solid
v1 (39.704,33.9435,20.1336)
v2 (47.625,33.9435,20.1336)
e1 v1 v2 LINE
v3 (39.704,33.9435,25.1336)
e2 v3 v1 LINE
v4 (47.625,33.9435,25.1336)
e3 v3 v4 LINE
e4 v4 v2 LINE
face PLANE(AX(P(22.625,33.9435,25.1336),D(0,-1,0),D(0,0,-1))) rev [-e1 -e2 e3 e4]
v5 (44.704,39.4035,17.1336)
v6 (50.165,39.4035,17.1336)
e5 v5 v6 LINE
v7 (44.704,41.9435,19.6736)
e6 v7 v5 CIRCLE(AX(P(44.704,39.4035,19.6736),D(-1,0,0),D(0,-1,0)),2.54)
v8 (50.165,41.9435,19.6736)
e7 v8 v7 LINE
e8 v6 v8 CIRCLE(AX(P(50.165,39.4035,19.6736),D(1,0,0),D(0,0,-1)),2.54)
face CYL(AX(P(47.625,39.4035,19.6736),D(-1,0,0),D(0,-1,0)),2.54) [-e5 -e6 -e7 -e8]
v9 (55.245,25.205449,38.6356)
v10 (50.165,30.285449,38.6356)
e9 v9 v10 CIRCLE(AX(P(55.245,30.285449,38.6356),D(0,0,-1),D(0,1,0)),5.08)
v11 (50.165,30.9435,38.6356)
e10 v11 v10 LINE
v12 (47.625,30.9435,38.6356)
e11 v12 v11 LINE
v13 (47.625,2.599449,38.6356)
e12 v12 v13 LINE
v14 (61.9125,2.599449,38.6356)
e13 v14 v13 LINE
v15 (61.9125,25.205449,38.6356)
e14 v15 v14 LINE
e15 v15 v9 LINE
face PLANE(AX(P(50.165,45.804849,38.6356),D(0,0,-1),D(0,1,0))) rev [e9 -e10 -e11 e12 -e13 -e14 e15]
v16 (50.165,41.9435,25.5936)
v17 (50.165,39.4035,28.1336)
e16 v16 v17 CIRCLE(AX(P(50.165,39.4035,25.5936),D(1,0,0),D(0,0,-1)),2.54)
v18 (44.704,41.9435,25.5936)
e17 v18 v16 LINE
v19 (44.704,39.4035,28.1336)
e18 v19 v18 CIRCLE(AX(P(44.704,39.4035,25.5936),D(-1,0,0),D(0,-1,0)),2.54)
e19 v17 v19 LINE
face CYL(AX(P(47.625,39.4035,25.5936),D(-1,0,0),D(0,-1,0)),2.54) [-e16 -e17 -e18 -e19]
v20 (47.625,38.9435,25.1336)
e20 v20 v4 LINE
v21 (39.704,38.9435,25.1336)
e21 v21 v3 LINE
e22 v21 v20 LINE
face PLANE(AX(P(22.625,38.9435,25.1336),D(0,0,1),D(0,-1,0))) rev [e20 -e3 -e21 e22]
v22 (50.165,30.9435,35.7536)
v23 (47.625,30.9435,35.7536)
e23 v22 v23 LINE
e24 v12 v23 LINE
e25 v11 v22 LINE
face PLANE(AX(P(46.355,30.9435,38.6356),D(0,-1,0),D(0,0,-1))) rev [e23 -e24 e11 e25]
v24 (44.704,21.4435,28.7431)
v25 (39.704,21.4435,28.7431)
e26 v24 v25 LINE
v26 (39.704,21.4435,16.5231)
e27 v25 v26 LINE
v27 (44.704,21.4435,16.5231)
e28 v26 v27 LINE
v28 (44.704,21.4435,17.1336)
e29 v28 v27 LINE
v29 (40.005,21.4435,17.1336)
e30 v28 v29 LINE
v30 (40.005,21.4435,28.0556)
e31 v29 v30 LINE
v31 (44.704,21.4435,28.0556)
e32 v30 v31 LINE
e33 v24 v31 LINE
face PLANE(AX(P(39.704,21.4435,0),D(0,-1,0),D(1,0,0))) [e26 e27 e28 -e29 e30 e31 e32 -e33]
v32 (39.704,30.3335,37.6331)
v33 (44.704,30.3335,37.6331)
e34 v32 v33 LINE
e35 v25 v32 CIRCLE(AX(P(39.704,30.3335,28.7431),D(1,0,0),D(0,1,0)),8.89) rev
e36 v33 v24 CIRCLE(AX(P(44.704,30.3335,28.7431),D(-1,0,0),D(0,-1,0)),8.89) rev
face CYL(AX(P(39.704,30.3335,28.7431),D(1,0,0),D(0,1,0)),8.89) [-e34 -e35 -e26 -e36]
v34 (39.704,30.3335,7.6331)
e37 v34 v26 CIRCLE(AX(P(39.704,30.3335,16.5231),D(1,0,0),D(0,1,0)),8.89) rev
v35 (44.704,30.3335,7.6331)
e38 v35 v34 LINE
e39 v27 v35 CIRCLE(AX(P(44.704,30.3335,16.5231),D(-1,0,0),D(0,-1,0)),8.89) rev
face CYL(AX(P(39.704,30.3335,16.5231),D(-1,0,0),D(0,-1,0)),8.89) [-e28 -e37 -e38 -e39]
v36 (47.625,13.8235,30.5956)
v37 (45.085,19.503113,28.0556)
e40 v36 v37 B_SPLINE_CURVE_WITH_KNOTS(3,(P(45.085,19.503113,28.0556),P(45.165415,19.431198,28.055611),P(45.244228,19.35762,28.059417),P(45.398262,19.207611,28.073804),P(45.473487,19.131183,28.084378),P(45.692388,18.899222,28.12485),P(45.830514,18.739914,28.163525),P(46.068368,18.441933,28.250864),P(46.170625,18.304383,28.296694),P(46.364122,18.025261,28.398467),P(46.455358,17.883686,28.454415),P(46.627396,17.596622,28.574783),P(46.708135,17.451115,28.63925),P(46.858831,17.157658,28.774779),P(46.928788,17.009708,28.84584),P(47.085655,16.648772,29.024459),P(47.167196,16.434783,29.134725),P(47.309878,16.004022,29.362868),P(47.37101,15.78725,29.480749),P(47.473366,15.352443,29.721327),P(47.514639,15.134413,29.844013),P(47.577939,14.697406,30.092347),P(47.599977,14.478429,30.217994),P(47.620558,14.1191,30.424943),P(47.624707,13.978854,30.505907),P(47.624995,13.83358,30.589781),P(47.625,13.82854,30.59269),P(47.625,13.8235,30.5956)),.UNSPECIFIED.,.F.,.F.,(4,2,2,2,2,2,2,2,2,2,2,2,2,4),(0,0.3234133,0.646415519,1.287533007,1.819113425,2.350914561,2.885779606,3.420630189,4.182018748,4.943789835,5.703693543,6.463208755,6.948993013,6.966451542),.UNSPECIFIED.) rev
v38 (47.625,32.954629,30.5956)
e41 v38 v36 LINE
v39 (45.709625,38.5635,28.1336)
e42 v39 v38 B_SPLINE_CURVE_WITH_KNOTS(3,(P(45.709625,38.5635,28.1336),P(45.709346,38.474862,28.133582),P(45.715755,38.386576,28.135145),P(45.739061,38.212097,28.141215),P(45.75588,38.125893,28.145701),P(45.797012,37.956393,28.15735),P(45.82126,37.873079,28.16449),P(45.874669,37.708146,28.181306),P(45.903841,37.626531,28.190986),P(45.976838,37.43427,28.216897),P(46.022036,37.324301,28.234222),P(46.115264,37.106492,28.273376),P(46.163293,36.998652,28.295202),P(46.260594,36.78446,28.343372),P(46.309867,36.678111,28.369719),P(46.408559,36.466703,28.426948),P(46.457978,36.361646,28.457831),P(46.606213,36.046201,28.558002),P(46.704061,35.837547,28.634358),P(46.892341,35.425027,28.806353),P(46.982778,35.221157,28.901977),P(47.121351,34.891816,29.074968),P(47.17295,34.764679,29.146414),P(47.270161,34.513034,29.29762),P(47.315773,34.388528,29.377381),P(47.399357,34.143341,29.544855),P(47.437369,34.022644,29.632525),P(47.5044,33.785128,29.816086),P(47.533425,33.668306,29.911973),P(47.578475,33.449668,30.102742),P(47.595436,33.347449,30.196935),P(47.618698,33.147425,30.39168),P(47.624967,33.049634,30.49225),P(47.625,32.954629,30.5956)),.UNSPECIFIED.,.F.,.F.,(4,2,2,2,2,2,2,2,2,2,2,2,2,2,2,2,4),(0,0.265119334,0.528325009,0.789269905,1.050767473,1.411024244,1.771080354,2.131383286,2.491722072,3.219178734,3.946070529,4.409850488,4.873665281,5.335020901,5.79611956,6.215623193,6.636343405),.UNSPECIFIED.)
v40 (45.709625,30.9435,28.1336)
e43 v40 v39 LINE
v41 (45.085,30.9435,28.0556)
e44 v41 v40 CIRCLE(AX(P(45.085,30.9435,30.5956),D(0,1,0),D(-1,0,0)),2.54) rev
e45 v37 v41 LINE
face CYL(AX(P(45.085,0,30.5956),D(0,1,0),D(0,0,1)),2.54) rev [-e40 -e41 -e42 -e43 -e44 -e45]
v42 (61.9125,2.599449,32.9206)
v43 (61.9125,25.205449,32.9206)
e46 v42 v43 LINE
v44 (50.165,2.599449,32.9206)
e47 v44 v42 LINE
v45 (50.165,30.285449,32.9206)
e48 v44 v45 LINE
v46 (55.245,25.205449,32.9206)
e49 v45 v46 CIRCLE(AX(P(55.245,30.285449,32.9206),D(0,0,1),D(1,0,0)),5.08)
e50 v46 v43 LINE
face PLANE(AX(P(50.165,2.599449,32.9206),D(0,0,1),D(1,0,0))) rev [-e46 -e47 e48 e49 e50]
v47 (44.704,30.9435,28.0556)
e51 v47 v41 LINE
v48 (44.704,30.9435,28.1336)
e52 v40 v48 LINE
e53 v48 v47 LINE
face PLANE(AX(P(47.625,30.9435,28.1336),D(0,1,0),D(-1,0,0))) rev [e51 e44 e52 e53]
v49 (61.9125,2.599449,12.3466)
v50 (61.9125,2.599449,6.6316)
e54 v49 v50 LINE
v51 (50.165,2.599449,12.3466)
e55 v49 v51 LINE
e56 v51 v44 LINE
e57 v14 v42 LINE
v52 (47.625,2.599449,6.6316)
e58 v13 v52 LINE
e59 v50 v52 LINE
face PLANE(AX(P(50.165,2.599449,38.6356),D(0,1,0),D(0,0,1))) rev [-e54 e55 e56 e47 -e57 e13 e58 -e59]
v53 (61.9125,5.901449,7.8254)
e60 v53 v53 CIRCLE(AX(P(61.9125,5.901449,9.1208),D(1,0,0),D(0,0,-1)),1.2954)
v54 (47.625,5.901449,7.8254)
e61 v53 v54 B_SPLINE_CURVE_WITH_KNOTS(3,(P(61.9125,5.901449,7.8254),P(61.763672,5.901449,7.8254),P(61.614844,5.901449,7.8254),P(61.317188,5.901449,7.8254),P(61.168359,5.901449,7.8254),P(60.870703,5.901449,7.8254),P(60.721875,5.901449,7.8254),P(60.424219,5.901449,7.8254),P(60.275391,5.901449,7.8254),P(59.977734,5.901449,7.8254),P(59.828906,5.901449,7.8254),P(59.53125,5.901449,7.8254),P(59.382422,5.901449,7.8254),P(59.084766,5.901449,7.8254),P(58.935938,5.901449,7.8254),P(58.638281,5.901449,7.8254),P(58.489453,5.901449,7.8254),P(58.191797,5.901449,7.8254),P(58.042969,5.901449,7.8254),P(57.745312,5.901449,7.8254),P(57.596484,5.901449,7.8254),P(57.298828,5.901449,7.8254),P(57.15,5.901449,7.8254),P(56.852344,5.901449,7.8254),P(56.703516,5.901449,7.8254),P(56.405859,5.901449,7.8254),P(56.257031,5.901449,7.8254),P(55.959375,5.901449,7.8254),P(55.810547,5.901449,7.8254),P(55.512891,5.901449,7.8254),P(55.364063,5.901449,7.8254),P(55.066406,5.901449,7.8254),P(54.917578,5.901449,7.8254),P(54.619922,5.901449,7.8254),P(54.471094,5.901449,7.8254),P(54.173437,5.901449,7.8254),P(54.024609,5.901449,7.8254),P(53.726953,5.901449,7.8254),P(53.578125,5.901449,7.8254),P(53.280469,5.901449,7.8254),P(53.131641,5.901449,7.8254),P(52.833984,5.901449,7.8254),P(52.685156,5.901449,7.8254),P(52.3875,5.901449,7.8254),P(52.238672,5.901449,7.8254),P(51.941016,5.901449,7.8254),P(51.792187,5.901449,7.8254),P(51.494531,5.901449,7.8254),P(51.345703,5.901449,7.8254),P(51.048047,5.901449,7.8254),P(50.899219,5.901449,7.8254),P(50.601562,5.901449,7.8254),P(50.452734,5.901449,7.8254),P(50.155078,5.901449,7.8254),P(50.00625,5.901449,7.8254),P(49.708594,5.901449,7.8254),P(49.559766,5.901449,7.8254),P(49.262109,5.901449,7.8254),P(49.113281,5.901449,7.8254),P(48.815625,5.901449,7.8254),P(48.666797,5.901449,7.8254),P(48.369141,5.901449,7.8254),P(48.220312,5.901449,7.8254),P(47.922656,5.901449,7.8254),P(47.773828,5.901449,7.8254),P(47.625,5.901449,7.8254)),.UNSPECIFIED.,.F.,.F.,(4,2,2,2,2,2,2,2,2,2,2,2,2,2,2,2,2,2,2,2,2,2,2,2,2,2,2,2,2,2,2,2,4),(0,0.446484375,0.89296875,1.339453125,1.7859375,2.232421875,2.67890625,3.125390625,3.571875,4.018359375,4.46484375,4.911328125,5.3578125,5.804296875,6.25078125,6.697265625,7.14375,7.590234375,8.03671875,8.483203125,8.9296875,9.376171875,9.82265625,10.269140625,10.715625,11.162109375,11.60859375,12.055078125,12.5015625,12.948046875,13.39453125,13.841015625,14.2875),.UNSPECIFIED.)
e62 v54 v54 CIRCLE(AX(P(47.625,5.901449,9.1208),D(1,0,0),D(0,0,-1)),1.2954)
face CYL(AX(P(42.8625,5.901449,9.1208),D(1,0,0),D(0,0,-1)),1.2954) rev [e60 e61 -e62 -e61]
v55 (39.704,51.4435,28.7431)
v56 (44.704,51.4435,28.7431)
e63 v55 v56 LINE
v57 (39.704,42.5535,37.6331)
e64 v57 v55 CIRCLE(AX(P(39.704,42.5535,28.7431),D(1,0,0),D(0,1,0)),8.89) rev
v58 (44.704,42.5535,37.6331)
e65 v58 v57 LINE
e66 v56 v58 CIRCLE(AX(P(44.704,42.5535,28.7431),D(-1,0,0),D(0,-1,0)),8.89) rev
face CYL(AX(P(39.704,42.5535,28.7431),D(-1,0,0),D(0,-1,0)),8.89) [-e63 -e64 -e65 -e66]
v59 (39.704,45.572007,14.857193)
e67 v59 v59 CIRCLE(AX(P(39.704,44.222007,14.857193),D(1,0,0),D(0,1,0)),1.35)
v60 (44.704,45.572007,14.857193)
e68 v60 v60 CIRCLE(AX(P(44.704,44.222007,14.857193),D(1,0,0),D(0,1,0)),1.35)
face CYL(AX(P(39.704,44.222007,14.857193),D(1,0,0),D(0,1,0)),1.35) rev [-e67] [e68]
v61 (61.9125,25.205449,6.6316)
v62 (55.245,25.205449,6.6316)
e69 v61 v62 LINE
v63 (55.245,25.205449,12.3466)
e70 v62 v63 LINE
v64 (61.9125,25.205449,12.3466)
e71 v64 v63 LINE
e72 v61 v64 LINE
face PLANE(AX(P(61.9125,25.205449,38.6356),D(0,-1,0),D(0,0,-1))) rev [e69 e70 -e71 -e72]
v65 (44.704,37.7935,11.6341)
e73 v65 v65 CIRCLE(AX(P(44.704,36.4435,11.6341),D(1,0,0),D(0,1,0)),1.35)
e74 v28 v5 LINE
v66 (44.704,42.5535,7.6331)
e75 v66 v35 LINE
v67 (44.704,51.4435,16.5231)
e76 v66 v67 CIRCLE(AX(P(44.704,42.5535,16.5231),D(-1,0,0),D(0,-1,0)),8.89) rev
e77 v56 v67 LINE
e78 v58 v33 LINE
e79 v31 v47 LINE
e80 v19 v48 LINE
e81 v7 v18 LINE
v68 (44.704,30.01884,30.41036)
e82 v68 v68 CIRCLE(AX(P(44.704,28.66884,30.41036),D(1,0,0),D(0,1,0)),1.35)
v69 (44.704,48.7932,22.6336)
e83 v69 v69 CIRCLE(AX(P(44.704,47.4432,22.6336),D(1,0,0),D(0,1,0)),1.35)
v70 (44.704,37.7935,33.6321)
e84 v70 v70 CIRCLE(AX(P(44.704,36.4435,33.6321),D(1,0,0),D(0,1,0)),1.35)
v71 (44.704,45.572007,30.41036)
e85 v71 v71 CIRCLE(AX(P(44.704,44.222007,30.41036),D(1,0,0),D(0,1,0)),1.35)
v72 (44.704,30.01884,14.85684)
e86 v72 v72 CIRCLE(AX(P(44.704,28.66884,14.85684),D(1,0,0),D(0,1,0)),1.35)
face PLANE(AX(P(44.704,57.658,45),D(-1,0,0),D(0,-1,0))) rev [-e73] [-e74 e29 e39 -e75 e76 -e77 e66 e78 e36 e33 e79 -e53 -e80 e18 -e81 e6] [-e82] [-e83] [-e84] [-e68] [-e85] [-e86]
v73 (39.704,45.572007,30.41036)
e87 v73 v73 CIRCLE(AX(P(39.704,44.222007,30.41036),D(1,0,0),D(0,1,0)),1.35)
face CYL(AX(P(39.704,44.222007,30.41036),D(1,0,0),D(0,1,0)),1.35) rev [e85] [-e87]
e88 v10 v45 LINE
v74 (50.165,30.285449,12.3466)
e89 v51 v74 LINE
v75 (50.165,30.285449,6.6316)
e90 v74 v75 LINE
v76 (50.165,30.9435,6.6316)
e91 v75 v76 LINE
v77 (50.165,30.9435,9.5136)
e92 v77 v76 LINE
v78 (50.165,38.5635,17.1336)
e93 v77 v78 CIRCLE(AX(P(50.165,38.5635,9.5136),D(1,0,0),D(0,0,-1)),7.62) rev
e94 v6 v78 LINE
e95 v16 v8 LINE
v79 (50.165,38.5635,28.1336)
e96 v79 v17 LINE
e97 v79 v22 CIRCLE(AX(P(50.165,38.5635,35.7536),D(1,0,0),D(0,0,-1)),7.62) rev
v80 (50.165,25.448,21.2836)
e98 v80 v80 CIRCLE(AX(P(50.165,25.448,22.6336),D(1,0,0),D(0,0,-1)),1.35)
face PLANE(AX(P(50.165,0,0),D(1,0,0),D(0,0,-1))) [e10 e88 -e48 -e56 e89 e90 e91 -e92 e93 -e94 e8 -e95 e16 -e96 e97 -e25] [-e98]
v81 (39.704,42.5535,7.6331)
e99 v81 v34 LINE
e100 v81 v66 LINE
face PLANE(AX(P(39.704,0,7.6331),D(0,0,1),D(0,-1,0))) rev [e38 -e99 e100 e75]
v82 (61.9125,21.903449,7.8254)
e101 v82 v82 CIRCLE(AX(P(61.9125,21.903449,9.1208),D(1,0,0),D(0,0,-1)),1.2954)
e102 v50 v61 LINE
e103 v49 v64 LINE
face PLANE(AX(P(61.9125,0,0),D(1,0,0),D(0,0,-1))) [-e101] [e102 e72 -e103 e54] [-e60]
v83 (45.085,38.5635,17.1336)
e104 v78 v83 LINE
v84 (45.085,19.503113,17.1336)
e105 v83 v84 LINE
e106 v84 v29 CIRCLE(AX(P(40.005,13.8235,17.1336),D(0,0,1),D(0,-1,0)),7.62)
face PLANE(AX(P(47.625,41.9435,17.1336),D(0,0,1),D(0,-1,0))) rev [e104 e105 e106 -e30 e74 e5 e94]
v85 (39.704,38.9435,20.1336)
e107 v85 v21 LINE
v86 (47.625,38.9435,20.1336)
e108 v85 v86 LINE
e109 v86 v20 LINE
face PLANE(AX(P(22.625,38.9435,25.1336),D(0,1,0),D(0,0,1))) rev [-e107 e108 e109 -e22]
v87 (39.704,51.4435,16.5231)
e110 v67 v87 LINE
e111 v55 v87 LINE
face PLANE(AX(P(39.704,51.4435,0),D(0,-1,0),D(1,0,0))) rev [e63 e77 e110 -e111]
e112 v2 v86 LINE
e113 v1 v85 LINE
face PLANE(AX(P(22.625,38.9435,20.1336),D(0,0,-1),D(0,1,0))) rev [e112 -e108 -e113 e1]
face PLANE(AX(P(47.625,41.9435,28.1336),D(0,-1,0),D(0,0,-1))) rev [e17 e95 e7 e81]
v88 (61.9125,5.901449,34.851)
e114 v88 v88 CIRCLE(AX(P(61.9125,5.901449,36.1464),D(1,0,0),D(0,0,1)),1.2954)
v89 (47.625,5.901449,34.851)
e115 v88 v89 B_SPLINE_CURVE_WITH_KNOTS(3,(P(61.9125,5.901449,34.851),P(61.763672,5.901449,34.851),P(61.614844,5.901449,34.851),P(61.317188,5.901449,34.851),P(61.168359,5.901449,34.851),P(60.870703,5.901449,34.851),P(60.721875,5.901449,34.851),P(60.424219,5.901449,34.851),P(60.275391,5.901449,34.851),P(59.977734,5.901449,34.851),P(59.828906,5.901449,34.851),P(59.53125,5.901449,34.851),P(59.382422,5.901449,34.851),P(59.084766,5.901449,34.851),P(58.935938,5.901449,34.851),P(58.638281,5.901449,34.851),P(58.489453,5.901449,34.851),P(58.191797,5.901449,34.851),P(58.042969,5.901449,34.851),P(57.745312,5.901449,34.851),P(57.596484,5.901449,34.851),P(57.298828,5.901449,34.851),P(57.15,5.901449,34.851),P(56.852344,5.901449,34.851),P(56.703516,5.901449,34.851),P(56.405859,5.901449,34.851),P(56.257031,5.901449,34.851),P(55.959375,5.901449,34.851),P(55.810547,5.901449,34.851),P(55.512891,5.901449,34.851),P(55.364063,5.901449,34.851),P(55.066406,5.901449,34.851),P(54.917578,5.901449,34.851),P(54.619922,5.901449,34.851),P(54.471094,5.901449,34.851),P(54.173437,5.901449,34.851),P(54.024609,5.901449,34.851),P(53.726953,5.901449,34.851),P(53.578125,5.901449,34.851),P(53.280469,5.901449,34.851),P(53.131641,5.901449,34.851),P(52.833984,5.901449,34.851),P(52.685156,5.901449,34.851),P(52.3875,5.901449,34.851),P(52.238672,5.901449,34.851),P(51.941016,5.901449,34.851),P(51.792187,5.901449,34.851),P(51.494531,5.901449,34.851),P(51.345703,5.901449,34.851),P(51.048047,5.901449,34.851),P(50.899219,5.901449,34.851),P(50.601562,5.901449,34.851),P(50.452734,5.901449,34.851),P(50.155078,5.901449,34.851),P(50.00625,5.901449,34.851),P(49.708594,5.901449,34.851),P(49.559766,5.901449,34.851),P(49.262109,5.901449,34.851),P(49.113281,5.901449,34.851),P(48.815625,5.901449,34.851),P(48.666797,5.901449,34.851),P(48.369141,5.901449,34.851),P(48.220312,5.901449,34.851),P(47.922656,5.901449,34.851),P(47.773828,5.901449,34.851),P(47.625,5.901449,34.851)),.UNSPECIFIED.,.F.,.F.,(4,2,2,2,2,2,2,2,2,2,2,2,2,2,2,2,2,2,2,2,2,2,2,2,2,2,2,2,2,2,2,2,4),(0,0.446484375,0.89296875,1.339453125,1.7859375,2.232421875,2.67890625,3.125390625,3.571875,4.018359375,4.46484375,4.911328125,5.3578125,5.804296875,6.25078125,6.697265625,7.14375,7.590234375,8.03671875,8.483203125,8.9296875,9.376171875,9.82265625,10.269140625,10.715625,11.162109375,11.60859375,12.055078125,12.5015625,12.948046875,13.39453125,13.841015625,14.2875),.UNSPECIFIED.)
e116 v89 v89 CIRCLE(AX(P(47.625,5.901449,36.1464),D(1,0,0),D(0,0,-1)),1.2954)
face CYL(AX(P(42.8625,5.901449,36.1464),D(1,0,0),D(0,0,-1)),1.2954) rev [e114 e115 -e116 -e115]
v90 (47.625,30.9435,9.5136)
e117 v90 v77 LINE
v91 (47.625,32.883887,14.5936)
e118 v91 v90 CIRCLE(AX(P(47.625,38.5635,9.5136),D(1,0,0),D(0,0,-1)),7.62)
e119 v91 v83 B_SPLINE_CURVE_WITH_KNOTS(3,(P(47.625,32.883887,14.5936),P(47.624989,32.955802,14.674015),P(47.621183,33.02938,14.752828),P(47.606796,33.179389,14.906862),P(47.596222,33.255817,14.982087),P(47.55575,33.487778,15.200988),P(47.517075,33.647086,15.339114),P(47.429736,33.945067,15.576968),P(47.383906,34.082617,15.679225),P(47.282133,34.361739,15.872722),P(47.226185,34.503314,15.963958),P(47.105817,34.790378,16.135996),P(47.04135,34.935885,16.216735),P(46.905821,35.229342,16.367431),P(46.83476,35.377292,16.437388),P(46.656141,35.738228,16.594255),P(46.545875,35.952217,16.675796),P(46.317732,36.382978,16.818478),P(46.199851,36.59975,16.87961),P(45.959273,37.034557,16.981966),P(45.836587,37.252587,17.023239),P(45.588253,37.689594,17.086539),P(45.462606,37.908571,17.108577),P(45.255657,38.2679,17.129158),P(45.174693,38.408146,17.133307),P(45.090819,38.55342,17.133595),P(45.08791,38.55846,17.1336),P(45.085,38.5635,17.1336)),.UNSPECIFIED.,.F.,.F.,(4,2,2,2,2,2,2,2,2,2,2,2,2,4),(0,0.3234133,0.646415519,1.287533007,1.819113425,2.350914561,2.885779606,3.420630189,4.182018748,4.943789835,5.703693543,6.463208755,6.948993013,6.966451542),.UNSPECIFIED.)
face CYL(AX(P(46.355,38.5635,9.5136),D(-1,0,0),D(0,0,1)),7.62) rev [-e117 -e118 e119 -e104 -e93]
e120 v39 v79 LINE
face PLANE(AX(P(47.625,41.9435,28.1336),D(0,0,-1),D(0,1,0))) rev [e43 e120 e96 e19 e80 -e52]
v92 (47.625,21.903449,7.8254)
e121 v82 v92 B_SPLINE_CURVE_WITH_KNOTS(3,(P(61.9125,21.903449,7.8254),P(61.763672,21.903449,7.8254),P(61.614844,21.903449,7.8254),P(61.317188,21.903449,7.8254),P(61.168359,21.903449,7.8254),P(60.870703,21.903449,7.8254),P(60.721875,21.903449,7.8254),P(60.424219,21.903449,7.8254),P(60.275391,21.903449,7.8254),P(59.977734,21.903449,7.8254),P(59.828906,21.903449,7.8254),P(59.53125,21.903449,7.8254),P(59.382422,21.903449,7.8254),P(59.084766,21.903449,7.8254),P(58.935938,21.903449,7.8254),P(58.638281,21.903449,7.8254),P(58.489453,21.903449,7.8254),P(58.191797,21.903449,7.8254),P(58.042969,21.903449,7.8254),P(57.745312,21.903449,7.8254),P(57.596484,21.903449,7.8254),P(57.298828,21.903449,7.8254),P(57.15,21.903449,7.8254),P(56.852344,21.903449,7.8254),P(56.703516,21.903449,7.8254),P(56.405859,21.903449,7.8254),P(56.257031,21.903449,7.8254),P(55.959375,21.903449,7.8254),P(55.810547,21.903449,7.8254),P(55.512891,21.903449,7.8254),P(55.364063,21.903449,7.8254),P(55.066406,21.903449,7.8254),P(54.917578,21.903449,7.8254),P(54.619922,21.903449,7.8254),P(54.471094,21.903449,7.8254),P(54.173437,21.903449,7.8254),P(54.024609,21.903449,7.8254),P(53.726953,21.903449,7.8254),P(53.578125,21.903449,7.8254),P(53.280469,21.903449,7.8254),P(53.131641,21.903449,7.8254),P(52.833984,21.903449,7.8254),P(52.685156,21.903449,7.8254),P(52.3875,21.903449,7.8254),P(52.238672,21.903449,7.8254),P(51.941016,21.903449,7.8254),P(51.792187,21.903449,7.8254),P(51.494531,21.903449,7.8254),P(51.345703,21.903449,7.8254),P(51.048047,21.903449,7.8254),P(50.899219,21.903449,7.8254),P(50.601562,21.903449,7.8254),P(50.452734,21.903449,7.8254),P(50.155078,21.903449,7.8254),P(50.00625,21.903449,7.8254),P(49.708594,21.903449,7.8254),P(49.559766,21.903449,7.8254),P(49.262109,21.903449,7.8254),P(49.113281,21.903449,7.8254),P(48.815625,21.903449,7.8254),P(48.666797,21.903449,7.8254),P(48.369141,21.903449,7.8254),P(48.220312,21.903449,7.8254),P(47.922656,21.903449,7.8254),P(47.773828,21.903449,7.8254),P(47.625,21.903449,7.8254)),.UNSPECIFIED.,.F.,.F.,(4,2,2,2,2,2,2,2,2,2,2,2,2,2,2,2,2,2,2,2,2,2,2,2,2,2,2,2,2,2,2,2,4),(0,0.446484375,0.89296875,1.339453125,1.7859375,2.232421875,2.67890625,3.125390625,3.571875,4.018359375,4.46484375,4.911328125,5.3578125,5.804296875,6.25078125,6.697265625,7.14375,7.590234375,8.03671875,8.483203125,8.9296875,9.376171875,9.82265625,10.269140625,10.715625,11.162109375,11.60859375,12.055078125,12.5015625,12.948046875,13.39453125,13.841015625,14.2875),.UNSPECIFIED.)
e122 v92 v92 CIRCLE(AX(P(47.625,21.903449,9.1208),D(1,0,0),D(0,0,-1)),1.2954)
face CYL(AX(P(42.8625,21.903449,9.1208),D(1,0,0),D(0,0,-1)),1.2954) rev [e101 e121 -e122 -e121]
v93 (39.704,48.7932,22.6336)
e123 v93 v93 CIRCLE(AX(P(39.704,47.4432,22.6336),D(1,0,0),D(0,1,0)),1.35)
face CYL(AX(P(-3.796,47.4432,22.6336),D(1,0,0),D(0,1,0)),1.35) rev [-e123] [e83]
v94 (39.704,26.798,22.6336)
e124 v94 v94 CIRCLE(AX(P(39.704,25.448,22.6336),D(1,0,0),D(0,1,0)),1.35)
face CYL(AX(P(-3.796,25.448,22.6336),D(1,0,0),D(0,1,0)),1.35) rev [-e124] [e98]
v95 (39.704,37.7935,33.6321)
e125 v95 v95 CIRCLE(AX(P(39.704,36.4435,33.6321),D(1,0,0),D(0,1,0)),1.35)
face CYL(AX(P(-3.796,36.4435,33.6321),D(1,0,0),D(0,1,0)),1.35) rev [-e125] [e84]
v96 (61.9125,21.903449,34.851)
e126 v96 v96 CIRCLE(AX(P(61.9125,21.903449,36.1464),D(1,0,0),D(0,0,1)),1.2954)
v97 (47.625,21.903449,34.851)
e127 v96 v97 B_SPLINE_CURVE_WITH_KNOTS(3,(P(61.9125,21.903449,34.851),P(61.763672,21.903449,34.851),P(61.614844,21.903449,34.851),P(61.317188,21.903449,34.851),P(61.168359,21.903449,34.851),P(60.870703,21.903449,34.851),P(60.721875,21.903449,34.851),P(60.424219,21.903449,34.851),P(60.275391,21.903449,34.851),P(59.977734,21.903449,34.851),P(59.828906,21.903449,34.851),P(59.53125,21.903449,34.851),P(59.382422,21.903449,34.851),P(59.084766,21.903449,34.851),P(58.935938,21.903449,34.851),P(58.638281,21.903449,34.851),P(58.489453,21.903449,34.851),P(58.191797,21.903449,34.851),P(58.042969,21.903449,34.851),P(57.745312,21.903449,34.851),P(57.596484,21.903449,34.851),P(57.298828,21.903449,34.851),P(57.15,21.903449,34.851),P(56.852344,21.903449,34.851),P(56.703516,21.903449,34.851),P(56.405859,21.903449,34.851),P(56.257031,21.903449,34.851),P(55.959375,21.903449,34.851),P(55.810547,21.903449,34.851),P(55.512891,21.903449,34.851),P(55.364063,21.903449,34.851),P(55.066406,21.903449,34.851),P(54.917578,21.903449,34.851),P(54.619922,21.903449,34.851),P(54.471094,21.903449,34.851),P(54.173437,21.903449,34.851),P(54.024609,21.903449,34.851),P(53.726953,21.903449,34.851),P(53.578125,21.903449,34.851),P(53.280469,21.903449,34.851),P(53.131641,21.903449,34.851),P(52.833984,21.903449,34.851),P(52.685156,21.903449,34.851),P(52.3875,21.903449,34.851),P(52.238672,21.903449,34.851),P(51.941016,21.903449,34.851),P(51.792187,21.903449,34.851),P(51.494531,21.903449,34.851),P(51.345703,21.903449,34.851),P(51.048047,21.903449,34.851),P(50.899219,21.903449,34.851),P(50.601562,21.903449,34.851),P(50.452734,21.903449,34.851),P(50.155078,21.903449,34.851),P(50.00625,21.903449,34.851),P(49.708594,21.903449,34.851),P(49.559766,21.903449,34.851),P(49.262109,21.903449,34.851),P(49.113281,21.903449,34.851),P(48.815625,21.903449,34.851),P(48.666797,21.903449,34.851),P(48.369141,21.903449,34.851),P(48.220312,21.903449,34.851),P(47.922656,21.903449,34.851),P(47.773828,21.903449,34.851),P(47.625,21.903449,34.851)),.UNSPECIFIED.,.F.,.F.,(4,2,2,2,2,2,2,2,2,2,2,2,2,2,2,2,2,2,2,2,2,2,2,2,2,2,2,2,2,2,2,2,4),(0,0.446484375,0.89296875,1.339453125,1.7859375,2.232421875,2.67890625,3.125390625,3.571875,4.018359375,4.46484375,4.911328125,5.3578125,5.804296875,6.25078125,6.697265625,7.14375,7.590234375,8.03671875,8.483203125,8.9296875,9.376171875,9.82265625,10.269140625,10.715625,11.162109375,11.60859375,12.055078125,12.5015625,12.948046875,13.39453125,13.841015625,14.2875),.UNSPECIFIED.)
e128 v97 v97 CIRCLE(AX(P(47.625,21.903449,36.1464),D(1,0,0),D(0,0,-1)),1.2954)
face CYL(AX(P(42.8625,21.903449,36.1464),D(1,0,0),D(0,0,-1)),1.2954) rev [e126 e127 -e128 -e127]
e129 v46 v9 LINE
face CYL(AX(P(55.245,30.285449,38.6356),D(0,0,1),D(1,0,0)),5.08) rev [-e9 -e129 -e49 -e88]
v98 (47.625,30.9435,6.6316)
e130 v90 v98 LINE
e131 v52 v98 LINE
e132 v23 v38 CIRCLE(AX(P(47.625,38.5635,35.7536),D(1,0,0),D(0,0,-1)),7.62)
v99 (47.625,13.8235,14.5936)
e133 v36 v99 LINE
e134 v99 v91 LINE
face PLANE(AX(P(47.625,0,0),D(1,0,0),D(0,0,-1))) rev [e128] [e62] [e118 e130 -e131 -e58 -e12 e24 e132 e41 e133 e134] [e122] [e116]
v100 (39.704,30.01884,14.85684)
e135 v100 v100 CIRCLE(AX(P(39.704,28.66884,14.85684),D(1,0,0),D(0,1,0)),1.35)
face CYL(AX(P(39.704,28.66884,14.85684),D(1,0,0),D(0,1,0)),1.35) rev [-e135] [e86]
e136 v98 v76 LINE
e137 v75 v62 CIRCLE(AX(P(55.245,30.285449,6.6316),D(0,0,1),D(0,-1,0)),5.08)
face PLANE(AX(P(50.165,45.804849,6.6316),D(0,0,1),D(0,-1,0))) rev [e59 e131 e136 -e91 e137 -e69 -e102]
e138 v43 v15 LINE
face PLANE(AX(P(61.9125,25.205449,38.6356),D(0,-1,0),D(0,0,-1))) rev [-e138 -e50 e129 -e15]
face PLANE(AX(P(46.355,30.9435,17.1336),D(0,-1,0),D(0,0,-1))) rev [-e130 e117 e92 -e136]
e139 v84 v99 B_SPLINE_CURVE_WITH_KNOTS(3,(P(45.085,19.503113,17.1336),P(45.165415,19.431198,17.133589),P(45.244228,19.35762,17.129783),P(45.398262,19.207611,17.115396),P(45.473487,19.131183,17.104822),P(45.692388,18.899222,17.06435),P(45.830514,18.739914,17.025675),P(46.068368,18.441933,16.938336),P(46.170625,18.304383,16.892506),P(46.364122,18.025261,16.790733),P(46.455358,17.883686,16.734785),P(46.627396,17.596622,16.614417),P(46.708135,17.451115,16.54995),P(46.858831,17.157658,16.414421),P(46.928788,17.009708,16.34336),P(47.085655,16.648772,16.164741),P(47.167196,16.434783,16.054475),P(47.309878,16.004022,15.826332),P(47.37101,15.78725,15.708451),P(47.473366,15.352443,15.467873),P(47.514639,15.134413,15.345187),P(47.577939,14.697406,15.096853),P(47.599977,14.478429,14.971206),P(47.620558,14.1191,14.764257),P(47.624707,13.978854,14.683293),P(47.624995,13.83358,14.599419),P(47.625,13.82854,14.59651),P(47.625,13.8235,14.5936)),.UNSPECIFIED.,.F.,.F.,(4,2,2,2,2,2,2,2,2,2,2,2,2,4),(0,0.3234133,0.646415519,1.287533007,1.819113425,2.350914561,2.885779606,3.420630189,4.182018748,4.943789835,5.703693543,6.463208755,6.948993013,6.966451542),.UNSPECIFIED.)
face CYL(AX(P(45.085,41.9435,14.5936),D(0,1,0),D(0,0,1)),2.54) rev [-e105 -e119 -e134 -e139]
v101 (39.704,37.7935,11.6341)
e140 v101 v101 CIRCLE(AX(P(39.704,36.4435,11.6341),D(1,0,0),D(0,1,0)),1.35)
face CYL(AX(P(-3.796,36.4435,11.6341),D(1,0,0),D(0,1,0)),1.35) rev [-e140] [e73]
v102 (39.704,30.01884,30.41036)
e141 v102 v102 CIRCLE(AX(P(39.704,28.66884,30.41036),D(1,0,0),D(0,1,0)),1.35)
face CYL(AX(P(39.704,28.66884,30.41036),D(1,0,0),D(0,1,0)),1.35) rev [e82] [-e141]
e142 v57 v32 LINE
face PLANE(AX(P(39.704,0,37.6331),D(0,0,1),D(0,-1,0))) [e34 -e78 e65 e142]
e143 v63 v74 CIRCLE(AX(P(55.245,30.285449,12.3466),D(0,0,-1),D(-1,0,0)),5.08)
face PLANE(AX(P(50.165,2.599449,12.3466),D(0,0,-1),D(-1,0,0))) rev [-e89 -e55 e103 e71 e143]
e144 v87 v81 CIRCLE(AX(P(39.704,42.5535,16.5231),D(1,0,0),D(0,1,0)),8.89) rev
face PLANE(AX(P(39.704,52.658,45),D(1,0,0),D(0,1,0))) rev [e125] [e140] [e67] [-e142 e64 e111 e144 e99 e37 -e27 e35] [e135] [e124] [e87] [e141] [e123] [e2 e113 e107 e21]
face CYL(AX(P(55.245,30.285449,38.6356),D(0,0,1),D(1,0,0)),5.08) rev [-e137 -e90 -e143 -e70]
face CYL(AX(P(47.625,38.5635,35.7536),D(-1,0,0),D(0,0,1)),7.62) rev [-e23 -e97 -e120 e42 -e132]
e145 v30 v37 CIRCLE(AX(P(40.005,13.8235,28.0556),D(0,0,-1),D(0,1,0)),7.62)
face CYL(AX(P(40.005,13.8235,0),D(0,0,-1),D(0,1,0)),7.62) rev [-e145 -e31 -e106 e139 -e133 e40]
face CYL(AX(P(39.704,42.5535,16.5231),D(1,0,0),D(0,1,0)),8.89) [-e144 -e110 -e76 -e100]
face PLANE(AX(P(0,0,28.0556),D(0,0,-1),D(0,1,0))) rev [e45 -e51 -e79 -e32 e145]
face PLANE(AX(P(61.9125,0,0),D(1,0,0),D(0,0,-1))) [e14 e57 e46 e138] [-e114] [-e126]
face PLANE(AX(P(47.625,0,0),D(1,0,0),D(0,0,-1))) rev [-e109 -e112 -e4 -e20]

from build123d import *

# Parameters (mm, degrees)
BOSS_EXTRUDE1_DEPTH = 45
SKETCH4_R           = 1.35
CUT_EXTRUDE3_DEPTH  = 88.759301296
SKETCH16_W          = 54.601375451
SKETCH16_H          = 80.563035577
CUT_EXTRUDE6_DEPTH  = 86.719849393
SKETCH17_W          = 45
SKETCH17_H          = 36.75
SKETCH17_W_2        = 30
SKETCH17_H_2        = 30
CUT_EXTRUDE7_DEPTH  = 74.310606081
SKETCH18_R          = 1.35
CUT_EXTRUDE8_DEPTH  = 64.93499752
FILLET1_R           = 8.89
SKETCH19_W          = 11
SKETCH19_H          = 11
BOSS_EXTRUDE2_DEPTH = 2.921
SKETCH20_W          = 5
SKETCH20_H          = 5
CUT_EXTRUDE9_DEPTH  = 25
SKETCH26_W          = 32.004
SKETCH26_H          = 43.2054
BOSS_EXTRUDE3_DEPTH = 2.54
SKETCH27_W          = 32.004
SKETCH27_H          = 22.606
BOSS_EXTRUDE4_DEPTH = 11.7475
SKETCH28_R          = 1.2954
CUT_EXTRUDE11_DEPTH = 19.05
CUT_EXTRUDE14_DEPTH = 3.81
SKETCH32_W          = 2.921
SKETCH32_H          = 9.5
BOSS_EXTRUDE5_DEPTH = 10.922
SKETCH33_W          = 11.7475
SKETCH33_H          = 20.574
CUT_EXTRUDE15_DEPTH = 78.55193447
FILLET2_R           = 5.08
FILLET3_R           = 5.08
FILLET4_R           = 7.62
FILLET5_R           = 7.62
FILLET6_R           = 7.62
FILLET7_R           = 2.54
FILLET8_R           = 2.54
FILLET9_R           = 2.54
FILLET10_R          = 2.54
CUT_EXTRUDE16_START = -11.43
SKETCH34_R          = 1.35
CUT_EXTRUDE16_DEPTH = 11.43


with BuildPart() as part:
    # Sketch1 → Boss-Extrude1 (new body)
    with BuildSketch(Plane.XY):
        Polygon((-3.796, -4.492), (-3.796, 57.658), (44.704, 57.658), (44.704, 20.908), (39.704, 20.908), (39.704, 52.658), (1.204, 52.658), (1.204, -4.492), align=None)
    extrude(amount=BOSS_EXTRUDE1_DEPTH)

    # Sketch4 → Cut-Extrude3 (cut, through all)
    with BuildSketch(Plane(origin=(44.704, 0, 0), x_dir=(0, 0, -1), z_dir=(1, 0, 0))):
        with Locations(Location((-22.6336, 47.4432, 0), (0, 0, 90))):
            Circle(SKETCH4_R)
        with Locations(Location((-22.6336, 25.448, 0), (0, 0, 90))):
            Circle(SKETCH4_R)
        with Locations(Location((-11.6341, 36.4435, 0), (0, 0, 90))):
            Circle(SKETCH4_R)
        with Locations(Location((-33.6321, 36.4435, 0), (0, 0, 90))):
            Circle(SKETCH4_R)
    extrude(amount=-CUT_EXTRUDE3_DEPTH, mode=Mode.SUBTRACT)

    # Sketch16 → Cut-Extrude6 (cut, through all)
    with BuildSketch(Plane.XY.offset(45)):
        with Locations((12.403312274, 23.911522997)):
            Rectangle(SKETCH16_W, SKETCH16_H)
    extrude(amount=-CUT_EXTRUDE6_DEPTH, mode=Mode.SUBTRACT)

    # Sketch17 → Cut-Extrude7 (cut, through all)
    with BuildSketch(Plane(origin=(44.704, 0, 0), x_dir=(0, 0, -1), z_dir=(1, 0, 0))):
        with Locations((-22.5, 39.283)):
            Rectangle(SKETCH17_W, SKETCH17_H)
        with Locations((-22.6331, 36.4435)):
            Rectangle(SKETCH17_W_2, SKETCH17_H_2, mode=Mode.SUBTRACT)
    extrude(amount=-CUT_EXTRUDE7_DEPTH, mode=Mode.SUBTRACT)

    # Sketch18 → Cut-Extrude8 (cut, through all)
    with BuildSketch(Plane(origin=(44.704, 0, 0), x_dir=(0, 0, -1), z_dir=(1, 0, 0))):
        with Locations(Location((-14.857193174, 44.222006826, 0), (0, 0, 90))):
            Circle(SKETCH18_R)
        with Locations(Location((-30.410360379, 28.668839621, 0), (0, 0, 90))):
            Circle(SKETCH18_R)
        with Locations(Location((-14.856839621, 28.668839621, 0), (0, 0, 90))):
            Circle(SKETCH18_R)
        with Locations(Location((-30.410360379, 44.222006826, 0), (0, 0, 90))):
            Circle(SKETCH18_R)
    extrude(amount=-CUT_EXTRUDE8_DEPTH, mode=Mode.SUBTRACT)

    # Fillet1
    fillet1_edges = [part.edges().sort_by_distance(p)[0] for p in [
        (42.204, 51.4435, 7.6331),
        (42.204, 51.4435, 37.6331),
        (42.204, 21.4435, 37.6331),
        (42.204, 21.4435, 7.6331),
    ]]
    fillet(fillet1_edges, radius=FILLET1_R)

    # Sketch19 → Boss-Extrude2 (add)
    with BuildSketch(Plane(origin=(44.704, 0, 0), x_dir=(0, 0, -1), z_dir=(1, 0, 0))):
        with Locations((-22.6336, 36.4435)):
            Rectangle(SKETCH19_W, SKETCH19_H)
    extrude(amount=BOSS_EXTRUDE2_DEPTH)

    # Sketch20 → Cut-Extrude9 (cut)
    with BuildSketch(Plane(origin=(47.625, 0, 0), x_dir=(0, 0, -1), z_dir=(1, 0, 0))):
        with Locations((-22.6336, 36.4435)):
            Rectangle(SKETCH20_W, SKETCH20_H)
    extrude(amount=-CUT_EXTRUDE9_DEPTH, mode=Mode.SUBTRACT)

    # Sketch26 → Boss-Extrude3 (add)
    with BuildSketch(Plane(origin=(47.625, 0, 0), x_dir=(0, 0, -1), z_dir=(1, 0, 0))):
        with Locations((-22.6336, 24.202149454)):
            Rectangle(SKETCH26_W, SKETCH26_H)
    extrude(amount=BOSS_EXTRUDE3_DEPTH)

    # Sketch27 → Boss-Extrude4 (add)
    with BuildSketch(Plane(origin=(50.165, 0, 0), x_dir=(0, 0, -1), z_dir=(1, 0, 0))):
        with Locations((-22.6336, 13.902449454)):
            Rectangle(SKETCH27_W, SKETCH27_H)
    extrude(amount=BOSS_EXTRUDE4_DEPTH)

    # Sketch28 → Cut-Extrude11 (cut)
    with BuildSketch(Plane(origin=(61.9125, 0, 0), x_dir=(0, 0, -1), z_dir=(1, 0, 0))):
        with Locations((-9.1208, 21.903449454)):
            Circle(SKETCH28_R)
        with Locations((-9.1208, 5.901449454)):
            Circle(SKETCH28_R)
        with Locations((-36.1464, 5.901449454)):
            Circle(SKETCH28_R)
        with Locations((-36.1464, 21.903449454)):
            Circle(SKETCH28_R)
    extrude(amount=-CUT_EXTRUDE11_DEPTH, mode=Mode.SUBTRACT)

    # Sketch31 → Cut-Extrude14 (cut)
    with BuildSketch(Plane(origin=(50.165, 0, 0), x_dir=(0, 0, -1), z_dir=(1, 0, 0))):
        Polygon((-38.6356, 45.804849454), (-38.6356, 30.9435), (-28.1336, 30.9435), (-28.1336, 41.9435), (-17.1336, 41.9435), (-17.1336, 30.9435), (-6.6316, 30.9435), (-6.6316, 45.804849454), align=None)
    extrude(amount=-CUT_EXTRUDE14_DEPTH, mode=Mode.SUBTRACT)

    # Sketch32 → Boss-Extrude5 (add)
    with BuildSketch(Plane(origin=(0, 0, 17.1336), x_dir=(-1, 0, 0), z_dir=(0, 0, -1))):
        with Locations((-46.1645, 26.1935)):
            Rectangle(SKETCH32_W, SKETCH32_H)
    extrude(amount=-BOSS_EXTRUDE5_DEPTH)

    # Sketch33 → Cut-Extrude15 (cut, through all)
    with BuildSketch(Plane(origin=(0, 25.205449454, 0), x_dir=(1, 0, 0), z_dir=(0, 1, 0))):
        with Locations((56.03875, -22.6336)):
            Rectangle(SKETCH33_W, SKETCH33_H)
    extrude(amount=-CUT_EXTRUDE15_DEPTH, mode=Mode.SUBTRACT)

    # Fillet2
    fillet2_edges = [part.edges().sort_by_distance(p)[0] for p in [
        (50.165, 25.205449454, 35.7781),
    ]]
    fillet(fillet2_edges, radius=FILLET2_R)

    # Fillet3
    fillet3_edges = [part.edges().sort_by_distance(p)[0] for p in [
        (50.165, 25.205449454, 9.4891),
    ]]
    fillet(fillet3_edges, radius=FILLET3_R)

    # Fillet4
    # the kernel refuses this fillet: 7.62 mm, written as the material it adds along each edge
    with BuildSketch(Plane(origin=(47.625, 21.4435, 17.1336), x_dir=(-1, 0, 0), z_dir=(0, 0, 1))) as fillet4_piece_1:
        with BuildLine():
            CenterArc((FILLET4_R, FILLET4_R), FILLET4_R, 180, 90)
            Line((0, FILLET4_R), (0, 0))
            Line((0, 0), (FILLET4_R, 0))
        make_face()
    extrude(amount=10.922)

    # Fillet5
    fillet5_edges = [part.edges().sort_by_distance(p)[0] for p in [
        (48.895, 30.9435, 17.1336),
    ]]
    fillet(fillet5_edges, radius=FILLET5_R)

    # Fillet6
    fillet6_edges = [part.edges().sort_by_distance(p)[0] for p in [
        (48.895, 30.9435, 28.1336),
    ]]
    fillet(fillet6_edges, radius=FILLET6_R)

    # Fillet7
    fillet7_edges = [part.edges().sort_by_distance(p)[0] for p in [
        (47.4345, 41.9435, 28.1336),
    ]]
    fillet(fillet7_edges, radius=FILLET7_R)

    # Fillet8
    fillet8_edges = [part.edges().sort_by_distance(p)[0] for p in [
        (47.4345, 41.9435, 17.1336),
    ]]
    fillet(fillet8_edges, radius=FILLET8_R)

    # Fillet9
    fillet9_edges = [part.edges().sort_by_distance(p)[0] for p in [
        (47.625, 22.3835, 28.0556),
    ]]
    fillet(fillet9_edges, radius=FILLET9_R)

    # Fillet10
    fillet10_edges = [part.edges().sort_by_distance(p)[0] for p in [
        (47.625, 26.1935, 17.1336),
    ]]
    fillet(fillet10_edges, radius=FILLET10_R)

    # Sketch34 → Cut-Extrude16 (cut)
    with BuildSketch(Plane.ZY.offset(-39.704).offset(CUT_EXTRUDE16_START)):
        with Locations(Location((22.6336, 25.448, 0), (0, 0, 90))):
            Circle(SKETCH34_R)
    extrude(amount=CUT_EXTRUDE16_DEPTH, mode=Mode.SUBTRACT)


solid = part.part
